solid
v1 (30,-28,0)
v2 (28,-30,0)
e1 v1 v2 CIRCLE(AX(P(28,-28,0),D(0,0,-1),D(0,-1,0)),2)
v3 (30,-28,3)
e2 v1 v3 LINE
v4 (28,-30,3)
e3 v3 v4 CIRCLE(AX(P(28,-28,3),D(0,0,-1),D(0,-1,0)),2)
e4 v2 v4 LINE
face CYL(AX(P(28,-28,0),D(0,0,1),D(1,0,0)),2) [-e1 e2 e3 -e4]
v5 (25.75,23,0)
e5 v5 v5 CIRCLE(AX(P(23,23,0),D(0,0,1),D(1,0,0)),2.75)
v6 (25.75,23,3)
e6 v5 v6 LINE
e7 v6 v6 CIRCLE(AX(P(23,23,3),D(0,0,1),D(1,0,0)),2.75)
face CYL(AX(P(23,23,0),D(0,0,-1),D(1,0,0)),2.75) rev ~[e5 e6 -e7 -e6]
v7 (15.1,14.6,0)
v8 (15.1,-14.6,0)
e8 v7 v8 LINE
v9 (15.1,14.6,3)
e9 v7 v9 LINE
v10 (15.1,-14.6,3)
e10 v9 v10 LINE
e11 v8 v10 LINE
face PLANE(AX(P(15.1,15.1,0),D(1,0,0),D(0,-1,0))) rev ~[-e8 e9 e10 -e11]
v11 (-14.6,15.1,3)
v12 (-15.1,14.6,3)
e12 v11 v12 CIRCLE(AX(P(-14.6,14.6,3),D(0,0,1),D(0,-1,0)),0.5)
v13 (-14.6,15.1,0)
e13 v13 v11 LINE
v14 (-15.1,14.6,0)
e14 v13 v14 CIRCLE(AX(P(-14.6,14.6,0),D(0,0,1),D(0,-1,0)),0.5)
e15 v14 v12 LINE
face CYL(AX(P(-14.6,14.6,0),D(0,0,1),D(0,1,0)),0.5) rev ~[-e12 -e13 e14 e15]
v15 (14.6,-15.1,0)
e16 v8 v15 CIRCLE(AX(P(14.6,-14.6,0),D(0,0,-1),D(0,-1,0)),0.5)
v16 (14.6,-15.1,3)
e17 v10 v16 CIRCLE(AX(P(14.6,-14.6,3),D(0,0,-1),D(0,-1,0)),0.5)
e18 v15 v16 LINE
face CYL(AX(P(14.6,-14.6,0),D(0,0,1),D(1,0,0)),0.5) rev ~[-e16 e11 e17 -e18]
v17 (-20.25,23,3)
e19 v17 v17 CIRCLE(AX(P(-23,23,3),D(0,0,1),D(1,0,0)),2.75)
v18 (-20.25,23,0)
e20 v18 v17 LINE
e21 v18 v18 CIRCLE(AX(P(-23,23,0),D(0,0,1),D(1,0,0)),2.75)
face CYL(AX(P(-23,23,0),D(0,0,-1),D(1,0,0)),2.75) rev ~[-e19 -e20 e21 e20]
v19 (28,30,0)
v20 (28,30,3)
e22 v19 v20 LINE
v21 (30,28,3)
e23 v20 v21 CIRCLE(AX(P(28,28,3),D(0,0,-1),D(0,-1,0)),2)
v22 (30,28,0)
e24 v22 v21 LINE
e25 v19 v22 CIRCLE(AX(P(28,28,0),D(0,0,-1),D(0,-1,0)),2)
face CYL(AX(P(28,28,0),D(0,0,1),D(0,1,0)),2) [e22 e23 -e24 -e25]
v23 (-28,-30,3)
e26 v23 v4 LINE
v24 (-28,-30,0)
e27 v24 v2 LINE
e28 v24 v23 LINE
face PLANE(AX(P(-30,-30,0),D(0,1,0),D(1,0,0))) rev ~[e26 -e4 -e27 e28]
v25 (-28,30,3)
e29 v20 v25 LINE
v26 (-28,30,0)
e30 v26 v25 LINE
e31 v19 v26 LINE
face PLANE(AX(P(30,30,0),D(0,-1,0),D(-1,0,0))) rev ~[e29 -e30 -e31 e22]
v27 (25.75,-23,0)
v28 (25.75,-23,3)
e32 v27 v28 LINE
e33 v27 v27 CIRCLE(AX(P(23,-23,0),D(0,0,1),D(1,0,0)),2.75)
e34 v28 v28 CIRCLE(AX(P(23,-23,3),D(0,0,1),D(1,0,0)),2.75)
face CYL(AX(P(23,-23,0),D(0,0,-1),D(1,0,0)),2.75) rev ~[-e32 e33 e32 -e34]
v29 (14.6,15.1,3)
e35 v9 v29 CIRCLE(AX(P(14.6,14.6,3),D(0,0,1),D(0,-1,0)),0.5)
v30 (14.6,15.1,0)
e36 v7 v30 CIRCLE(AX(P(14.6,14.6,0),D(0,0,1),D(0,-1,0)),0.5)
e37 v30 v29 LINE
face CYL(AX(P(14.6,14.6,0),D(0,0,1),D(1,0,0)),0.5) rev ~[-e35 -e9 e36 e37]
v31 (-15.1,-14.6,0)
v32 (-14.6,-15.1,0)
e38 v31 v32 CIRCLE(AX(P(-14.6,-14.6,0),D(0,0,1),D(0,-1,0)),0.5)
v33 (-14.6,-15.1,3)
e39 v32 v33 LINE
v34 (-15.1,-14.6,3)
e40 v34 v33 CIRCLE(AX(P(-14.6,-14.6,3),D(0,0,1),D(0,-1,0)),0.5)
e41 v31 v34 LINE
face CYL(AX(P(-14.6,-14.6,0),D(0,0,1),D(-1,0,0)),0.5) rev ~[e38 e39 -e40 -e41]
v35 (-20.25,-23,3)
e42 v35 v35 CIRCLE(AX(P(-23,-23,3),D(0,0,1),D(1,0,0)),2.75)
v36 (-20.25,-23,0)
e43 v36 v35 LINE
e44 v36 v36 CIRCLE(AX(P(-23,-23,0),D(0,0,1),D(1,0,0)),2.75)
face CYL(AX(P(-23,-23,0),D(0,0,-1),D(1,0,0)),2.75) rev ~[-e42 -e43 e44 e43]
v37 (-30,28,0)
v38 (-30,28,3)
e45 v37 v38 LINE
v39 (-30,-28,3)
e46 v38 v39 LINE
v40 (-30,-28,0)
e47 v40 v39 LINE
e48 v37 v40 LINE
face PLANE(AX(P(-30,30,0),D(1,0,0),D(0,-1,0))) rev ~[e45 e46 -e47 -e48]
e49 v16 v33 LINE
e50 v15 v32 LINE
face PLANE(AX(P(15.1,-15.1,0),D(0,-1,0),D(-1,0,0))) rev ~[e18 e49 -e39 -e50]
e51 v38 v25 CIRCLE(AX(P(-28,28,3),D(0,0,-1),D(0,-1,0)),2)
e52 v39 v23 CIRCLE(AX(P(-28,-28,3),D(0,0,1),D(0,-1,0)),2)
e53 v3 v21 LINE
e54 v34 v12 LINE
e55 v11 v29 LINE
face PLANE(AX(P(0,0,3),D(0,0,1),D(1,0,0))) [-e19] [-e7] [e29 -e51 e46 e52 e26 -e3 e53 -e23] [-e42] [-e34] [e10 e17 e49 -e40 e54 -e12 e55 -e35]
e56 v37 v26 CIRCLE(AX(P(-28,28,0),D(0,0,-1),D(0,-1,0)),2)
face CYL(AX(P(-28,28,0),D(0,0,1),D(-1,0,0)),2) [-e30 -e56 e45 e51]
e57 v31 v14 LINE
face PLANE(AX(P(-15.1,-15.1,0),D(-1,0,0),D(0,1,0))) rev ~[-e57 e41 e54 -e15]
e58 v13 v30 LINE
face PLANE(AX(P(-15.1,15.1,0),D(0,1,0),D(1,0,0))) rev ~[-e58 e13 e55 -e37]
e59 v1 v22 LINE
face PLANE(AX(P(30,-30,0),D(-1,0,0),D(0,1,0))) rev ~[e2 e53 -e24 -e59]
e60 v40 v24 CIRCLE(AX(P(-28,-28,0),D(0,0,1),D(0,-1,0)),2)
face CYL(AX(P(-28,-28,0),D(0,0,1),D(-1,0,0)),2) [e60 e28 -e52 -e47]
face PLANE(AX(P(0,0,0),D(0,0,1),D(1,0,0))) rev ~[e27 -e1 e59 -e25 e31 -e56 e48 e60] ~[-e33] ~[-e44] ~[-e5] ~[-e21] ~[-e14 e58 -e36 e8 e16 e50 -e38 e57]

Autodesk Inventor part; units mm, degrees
ref_plane "YZ Plane" through (0, 0, 0) normal (1, 0, 0) x (0, 1, 0)
ref_plane "XZ Plane" through (0, 0, 0) normal (0, 1, 0) x (-1, 0, 0)
ref_plane "XY Plane" through (0, 0, 0) normal (0, 0, 1) x (1, 0, 0)
sketch "Sketch1" plane through (0, 0, 0) normal (0, 0, 1) x (1, 0, 0)
  line L0 (-30, -30) -> (30, -30)
  line L1 (30, -30) -> (30, 30)
  line L2 (30, 30) -> (-30, 30)
  line L3 (-30, 30) -> (-30, -30)
  line L4 (-30, -30) -> (30, 30) construction
  line L5 (30, -30) -> (-30, 30) construction
  line L6 (15.1, -15.1) -> (-15.1, -15.1)
  line L7 (-15.1, -15.1) -> (-15.1, 15.1)
  line L8 (-15.1, 15.1) -> (15.1, 15.1)
  line L9 (15.1, 15.1) -> (15.1, -15.1)
  line L10 (15.1, -15.1) -> (-15.1, 15.1) construction
  line L11 (-15.1, -15.1) -> (15.1, 15.1) construction
  circle A0 centre (-23, -23) radius 2.75
  circle A1 centre (23, -23) radius 2.75
  circle A2 centre (23, 23) radius 2.75
  circle A3 centre (-23, 23) radius 2.75
  line L12 (25.75, 25.75) -> (-25.75, 25.75) construction
  line L13 (-25.75, 25.75) -> (-25.75, -25.75) construction
  line L14 (-25.75, -25.75) -> (25.75, -25.75) construction
  line L15 (25.75, -25.75) -> (25.75, 25.75) construction
  line L16 (25.75, 25.75) -> (-25.75, -25.75) construction
  line L17 (-25.75, 25.75) -> (25.75, -25.75) construction
  line L18 (23, 23) -> (-23, 23) construction
  line L19 (-23, 23) -> (-23, -23) construction
  line L20 (-23, -23) -> (23, -23) construction
  line L21 (23, -23) -> (23, 23) construction
  line L22 (23, 23) -> (-23, -23) construction
  line L23 (-23, 23) -> (23, -23) construction
  point P0 (0, 0)
  dimension "d172" = 30.2
  dimension "d190" = 5.5
  dimension "d191" = 46
  dimension "d192" = 60
extrude "Plate5" add sketch "Sketch1" along normal blind 3
fillet "Corner Round1" radius 2 4 edges at (30, 30, 1.5) (-30, 30, 1.5) (-30, -30, 1.5) (30, -30, 1.5)
fillet "Corner Round2" radius 0.5 4 edges at (-15.1, 15.1, 1.5) (-15.1, -15.1, 1.5) (15.1, -15.1, 1.5) (15.1, 15.1, 1.5)
properties part number "PRS 1425 FDS Way FLANGE_D940" material "Stainless Steel"
